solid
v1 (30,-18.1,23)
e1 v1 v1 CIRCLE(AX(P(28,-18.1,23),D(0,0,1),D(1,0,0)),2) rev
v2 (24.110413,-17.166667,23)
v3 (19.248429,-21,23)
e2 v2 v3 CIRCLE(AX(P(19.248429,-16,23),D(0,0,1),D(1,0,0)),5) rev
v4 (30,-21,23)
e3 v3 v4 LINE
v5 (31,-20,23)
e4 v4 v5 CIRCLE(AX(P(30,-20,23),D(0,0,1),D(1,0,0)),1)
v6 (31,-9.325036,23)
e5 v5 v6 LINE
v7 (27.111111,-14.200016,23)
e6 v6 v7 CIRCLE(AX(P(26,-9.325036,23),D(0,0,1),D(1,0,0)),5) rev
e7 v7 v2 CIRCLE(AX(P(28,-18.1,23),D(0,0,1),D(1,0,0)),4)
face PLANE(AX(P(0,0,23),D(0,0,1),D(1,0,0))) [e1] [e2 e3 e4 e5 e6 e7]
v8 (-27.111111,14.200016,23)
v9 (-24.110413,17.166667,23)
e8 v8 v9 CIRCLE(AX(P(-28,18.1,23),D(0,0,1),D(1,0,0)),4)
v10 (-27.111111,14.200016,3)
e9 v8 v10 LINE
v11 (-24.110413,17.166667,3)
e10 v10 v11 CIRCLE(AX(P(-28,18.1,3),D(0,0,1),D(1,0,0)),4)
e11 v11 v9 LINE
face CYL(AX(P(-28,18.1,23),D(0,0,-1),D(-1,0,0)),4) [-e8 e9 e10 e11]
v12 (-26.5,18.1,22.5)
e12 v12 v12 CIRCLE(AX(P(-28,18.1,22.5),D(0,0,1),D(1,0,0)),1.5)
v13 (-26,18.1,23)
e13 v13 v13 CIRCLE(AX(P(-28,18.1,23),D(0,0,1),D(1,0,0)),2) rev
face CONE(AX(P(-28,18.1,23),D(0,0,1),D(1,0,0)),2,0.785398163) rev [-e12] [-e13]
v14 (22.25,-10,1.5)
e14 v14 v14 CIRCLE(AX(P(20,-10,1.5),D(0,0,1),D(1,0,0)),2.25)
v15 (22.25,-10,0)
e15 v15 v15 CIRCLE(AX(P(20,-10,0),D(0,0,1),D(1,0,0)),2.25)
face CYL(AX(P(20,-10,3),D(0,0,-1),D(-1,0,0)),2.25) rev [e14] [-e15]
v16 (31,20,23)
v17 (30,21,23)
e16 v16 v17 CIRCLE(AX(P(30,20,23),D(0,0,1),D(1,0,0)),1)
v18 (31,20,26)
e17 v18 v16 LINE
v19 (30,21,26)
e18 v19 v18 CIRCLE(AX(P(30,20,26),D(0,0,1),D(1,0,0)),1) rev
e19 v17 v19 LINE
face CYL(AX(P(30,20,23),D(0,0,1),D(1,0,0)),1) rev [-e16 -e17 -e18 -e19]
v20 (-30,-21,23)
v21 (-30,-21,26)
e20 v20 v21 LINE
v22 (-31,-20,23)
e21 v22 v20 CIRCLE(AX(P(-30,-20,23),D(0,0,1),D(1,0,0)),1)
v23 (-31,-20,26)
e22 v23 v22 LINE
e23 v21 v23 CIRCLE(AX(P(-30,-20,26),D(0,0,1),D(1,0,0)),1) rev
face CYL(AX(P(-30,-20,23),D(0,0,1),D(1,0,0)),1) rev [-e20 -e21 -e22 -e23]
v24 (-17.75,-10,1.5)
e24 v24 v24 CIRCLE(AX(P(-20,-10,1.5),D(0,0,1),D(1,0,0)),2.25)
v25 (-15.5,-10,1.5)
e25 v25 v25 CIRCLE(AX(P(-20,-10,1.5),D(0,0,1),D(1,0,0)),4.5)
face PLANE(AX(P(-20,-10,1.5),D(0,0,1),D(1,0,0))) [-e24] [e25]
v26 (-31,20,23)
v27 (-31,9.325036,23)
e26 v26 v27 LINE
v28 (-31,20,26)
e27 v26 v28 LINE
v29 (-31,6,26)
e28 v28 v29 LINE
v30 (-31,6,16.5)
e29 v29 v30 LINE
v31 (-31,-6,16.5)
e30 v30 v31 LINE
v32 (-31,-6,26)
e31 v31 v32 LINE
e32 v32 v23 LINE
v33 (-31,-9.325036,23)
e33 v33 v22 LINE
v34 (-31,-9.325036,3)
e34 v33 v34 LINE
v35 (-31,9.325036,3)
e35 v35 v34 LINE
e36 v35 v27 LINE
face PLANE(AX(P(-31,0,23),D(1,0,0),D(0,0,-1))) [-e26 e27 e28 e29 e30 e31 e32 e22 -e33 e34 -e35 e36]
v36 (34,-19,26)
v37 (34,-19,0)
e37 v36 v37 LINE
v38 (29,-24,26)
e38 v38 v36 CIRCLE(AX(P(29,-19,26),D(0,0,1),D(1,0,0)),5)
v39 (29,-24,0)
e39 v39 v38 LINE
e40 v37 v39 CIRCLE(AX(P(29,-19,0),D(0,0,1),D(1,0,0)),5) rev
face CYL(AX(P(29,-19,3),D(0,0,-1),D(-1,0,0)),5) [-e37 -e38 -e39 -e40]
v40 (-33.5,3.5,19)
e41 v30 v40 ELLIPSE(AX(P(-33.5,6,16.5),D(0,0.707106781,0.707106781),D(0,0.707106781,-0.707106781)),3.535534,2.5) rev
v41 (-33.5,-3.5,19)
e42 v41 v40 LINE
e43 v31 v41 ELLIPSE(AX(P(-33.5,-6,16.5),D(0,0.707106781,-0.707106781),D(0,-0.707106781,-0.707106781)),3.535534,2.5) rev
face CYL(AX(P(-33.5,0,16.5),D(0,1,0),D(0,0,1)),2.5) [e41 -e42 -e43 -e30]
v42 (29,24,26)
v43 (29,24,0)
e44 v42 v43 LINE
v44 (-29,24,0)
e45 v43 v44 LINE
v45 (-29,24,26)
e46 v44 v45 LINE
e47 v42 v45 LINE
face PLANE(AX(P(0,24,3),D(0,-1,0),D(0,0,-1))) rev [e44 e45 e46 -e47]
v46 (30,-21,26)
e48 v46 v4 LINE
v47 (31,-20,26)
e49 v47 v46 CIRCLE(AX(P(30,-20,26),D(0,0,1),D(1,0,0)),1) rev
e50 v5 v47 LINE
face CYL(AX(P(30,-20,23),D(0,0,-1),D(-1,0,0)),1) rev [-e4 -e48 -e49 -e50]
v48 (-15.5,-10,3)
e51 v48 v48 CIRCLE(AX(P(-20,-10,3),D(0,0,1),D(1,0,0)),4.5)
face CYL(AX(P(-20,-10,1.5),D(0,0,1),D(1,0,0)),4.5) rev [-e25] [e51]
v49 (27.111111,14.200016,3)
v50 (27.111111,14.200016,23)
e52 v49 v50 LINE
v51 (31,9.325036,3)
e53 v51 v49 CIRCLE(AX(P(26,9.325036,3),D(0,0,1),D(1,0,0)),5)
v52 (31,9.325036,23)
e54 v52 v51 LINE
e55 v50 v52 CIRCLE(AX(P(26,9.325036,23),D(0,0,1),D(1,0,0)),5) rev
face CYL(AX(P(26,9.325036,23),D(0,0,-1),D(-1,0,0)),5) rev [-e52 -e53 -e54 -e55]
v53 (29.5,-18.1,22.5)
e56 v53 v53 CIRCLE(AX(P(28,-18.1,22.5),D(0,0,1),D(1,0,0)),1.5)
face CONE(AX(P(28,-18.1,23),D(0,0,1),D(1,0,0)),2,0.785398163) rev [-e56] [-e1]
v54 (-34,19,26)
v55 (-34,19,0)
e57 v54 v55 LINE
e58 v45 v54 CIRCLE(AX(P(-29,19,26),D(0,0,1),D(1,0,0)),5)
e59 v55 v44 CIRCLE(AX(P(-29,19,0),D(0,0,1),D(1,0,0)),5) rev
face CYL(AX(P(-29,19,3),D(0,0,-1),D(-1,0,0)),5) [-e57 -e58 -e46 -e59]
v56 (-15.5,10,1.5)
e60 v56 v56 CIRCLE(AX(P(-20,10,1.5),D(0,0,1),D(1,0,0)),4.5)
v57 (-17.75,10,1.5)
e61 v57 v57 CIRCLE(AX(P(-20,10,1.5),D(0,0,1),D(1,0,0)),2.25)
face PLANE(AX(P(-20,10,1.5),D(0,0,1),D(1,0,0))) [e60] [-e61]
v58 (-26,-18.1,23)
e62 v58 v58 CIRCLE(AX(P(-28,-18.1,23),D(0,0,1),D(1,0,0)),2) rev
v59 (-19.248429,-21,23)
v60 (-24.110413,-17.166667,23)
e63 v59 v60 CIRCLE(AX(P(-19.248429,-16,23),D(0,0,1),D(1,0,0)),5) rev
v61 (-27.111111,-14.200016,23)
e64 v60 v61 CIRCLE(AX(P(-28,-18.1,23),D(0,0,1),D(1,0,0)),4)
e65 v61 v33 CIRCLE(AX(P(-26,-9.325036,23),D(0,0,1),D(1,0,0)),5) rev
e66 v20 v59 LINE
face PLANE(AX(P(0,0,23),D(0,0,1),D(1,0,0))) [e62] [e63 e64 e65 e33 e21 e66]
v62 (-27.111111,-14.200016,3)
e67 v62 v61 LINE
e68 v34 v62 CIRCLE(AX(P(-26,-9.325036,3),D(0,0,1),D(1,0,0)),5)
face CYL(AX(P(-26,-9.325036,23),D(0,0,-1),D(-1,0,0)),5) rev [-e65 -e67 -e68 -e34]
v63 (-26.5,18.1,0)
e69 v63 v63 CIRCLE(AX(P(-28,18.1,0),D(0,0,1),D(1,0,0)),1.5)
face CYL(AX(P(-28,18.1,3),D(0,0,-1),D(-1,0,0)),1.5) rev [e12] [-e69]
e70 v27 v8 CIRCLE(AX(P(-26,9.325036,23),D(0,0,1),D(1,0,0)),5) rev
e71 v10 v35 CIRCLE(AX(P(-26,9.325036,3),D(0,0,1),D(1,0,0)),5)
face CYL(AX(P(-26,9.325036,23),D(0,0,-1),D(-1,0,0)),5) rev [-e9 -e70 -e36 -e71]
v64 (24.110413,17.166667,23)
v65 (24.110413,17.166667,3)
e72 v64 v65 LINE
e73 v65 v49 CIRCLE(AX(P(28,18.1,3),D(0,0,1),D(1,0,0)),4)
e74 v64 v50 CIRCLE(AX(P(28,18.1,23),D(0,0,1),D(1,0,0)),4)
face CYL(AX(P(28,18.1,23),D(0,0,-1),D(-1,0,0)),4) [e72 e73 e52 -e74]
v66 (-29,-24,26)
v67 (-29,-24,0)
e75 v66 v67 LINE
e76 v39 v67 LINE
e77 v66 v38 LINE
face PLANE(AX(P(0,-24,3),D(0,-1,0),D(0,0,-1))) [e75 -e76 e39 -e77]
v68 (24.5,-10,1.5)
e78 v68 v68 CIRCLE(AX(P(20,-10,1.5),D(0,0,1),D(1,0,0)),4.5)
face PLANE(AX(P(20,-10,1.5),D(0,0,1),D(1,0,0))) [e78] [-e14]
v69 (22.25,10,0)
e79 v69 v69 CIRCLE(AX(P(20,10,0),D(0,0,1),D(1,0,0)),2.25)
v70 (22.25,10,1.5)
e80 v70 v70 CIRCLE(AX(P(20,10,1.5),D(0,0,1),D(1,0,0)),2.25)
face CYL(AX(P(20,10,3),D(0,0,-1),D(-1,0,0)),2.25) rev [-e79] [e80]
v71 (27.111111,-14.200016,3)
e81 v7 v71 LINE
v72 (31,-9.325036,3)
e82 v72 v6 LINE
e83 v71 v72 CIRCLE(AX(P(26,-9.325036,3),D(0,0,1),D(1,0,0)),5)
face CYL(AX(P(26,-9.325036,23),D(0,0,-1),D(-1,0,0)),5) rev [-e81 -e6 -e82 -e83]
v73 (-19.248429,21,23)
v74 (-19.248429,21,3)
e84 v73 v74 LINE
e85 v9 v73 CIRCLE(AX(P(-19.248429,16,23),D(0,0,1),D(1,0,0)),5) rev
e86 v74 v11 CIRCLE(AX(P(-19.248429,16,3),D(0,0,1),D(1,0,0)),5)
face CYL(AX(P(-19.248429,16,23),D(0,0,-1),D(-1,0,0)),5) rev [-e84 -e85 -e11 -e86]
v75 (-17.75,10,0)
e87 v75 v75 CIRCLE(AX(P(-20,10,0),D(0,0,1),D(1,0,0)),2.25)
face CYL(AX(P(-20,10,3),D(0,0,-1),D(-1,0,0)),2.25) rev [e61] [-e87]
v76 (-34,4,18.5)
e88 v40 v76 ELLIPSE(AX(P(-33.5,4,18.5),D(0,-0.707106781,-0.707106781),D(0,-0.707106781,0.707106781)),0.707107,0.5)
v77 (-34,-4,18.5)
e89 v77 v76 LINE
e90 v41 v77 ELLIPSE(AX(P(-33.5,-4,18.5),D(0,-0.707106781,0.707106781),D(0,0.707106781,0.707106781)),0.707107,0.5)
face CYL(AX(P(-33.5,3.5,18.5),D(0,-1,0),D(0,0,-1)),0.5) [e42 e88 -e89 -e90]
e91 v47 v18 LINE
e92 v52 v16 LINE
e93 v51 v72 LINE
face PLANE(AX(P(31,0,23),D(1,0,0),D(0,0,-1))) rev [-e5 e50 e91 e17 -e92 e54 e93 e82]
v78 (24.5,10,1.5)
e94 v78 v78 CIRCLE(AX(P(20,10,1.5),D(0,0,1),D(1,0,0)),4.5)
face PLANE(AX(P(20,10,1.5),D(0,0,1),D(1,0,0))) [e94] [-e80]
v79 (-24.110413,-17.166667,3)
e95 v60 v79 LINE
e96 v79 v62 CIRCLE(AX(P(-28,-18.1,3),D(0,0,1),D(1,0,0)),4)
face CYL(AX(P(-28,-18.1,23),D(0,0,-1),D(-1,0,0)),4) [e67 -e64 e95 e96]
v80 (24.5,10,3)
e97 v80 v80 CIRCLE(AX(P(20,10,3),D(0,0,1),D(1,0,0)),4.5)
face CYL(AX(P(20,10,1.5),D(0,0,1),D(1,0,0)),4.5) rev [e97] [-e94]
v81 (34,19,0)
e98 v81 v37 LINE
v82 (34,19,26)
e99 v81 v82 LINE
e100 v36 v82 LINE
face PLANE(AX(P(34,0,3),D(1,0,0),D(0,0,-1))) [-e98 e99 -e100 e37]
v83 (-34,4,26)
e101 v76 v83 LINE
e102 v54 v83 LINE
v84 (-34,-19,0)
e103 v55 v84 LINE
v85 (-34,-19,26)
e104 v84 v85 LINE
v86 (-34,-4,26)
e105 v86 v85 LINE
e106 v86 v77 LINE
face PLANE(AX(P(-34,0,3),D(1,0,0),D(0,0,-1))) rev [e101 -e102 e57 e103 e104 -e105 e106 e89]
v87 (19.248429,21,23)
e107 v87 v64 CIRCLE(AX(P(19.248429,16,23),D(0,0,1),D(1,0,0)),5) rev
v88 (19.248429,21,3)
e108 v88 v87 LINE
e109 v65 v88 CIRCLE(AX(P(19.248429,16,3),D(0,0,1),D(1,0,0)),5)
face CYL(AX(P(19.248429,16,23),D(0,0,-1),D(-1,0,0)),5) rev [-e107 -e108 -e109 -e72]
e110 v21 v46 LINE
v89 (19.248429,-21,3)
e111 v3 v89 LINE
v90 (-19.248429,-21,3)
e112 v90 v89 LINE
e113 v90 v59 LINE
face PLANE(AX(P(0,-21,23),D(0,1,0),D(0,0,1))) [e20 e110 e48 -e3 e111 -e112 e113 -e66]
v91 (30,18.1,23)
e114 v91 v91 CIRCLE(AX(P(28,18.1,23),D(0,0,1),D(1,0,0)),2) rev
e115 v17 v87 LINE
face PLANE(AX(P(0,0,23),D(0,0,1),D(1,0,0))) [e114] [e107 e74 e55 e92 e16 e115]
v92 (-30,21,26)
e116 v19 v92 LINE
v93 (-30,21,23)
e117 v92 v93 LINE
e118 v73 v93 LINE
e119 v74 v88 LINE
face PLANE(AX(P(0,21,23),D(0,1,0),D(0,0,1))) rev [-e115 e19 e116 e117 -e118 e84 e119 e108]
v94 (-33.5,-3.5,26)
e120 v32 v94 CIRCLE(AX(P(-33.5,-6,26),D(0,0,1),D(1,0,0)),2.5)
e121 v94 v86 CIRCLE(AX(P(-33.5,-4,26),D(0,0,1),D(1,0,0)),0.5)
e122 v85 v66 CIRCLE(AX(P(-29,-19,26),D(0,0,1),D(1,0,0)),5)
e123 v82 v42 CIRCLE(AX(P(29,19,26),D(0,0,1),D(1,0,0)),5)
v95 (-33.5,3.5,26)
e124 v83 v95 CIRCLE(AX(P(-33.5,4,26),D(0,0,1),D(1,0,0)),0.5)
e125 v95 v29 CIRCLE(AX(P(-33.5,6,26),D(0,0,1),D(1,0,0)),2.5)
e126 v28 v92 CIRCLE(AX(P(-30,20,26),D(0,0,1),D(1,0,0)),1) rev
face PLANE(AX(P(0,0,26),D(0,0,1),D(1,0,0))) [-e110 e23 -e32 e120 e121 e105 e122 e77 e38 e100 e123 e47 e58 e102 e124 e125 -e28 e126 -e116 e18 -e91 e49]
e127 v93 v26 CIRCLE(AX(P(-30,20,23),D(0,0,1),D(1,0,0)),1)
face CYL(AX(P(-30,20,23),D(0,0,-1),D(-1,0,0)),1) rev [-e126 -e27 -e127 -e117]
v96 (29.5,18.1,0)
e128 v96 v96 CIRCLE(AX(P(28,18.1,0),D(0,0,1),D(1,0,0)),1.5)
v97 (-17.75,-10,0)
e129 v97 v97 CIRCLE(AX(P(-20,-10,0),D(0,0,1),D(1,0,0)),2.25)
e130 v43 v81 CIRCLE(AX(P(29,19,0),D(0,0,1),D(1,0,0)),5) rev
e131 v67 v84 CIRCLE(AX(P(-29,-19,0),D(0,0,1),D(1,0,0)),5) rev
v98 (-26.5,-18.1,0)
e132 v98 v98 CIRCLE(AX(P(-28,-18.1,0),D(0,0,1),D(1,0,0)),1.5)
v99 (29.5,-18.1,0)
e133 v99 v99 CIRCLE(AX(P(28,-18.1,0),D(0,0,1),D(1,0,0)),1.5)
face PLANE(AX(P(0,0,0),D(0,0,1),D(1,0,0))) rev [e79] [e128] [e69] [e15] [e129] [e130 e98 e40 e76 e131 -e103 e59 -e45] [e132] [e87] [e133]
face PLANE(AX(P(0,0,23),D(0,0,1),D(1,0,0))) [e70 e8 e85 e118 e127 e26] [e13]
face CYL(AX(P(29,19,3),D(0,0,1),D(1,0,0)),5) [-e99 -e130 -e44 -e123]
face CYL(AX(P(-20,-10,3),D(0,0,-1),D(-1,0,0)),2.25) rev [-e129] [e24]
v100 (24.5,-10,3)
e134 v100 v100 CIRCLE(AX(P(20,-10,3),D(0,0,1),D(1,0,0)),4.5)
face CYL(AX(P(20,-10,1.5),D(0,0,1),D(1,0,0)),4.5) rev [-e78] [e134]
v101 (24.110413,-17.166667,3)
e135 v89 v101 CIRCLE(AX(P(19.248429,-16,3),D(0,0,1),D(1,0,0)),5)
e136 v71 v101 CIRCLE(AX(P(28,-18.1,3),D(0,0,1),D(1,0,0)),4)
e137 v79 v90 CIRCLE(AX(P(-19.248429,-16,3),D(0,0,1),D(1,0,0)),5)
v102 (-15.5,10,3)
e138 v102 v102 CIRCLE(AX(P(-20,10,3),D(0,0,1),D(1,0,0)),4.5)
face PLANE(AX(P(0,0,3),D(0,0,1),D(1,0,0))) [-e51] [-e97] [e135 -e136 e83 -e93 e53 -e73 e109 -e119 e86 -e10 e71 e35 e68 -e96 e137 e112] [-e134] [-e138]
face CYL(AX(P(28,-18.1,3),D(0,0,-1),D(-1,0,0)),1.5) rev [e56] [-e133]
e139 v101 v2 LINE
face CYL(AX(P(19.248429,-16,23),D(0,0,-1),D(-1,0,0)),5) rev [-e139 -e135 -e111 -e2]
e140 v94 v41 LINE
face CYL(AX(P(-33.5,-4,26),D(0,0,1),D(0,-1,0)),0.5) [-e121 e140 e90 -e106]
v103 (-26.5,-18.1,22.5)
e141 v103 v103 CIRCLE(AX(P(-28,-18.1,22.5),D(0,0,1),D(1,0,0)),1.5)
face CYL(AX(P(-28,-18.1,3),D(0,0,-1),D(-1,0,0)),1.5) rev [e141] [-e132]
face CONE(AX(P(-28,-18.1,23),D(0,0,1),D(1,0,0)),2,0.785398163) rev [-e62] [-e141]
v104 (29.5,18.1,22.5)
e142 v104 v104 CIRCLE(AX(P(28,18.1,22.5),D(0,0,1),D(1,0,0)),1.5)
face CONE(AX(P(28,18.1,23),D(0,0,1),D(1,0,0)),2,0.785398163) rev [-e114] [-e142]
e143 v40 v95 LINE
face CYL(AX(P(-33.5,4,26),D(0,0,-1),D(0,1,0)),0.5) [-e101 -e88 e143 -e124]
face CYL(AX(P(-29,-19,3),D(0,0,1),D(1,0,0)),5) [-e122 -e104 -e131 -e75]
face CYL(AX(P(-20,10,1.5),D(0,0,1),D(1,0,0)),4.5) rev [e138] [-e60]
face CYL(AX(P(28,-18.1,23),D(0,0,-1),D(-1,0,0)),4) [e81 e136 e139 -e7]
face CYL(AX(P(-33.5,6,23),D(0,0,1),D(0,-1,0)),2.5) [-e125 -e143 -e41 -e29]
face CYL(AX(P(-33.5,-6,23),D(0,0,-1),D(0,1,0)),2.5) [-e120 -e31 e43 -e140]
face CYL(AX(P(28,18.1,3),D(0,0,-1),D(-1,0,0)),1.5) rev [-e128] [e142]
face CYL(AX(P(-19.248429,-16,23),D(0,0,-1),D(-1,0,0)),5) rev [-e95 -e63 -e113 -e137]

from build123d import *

# Parameters (mm, degrees)
SCHIZZO1_W                   = 68
SCHIZZO1_H                   = 48
SCHIZZO1_R                   = 1.5
SCHIZZO1_R_2                 = 2.25
ESTRUSIONE_ESTRUSIONE1_DEPTH = 3
SCHIZZO2_W                   = 68
SCHIZZO2_H                   = 48
SCHIZZO2_R                   = 1.5
ESTRUSIONE_ESTRUSIONE2_DEPTH = 20
SCHIZZO3_W                   = 68
SCHIZZO3_H                   = 48
SCHIZZO3_W_2                 = 62
SCHIZZO3_H_2                 = 42
ESTRUSIONE_ESTRUSIONE3_DEPTH = 3
SMUSSO1_SIZE                 = 0.5
RACCORDO1_R                  = 5
SCHIZZO4_R                   = 4.5
TAGLIO_ESTRUSIONE1_DEPTH     = 1.5
RACCORDO2_R                  = 5
RACCORDO3_R                  = 1
TAGLIO_ESTRUSIONE2_REACH     = 78.655
SCHIZZO5_W                   = 7
SCHIZZO5_H                   = 7
RACCORDO4_R                  = 2.5
RACCORDO5_R                  = 0.5


with BuildPart() as part:
    # Schizzo1 → Estrusione-Estrusione1 (new body)
    with BuildSketch(Plane.XY):
        Rectangle(SCHIZZO1_W, SCHIZZO1_H)
        with Locations((-28, 18.1)):
            Circle(SCHIZZO1_R, mode=Mode.SUBTRACT)
        with Locations((-28, -18.1)):
            Circle(SCHIZZO1_R, mode=Mode.SUBTRACT)
        with Locations((28, -18.1)):
            Circle(SCHIZZO1_R, mode=Mode.SUBTRACT)
        with Locations((28, 18.1)):
            Circle(SCHIZZO1_R, mode=Mode.SUBTRACT)
        with Locations((20, -10)):
            Circle(SCHIZZO1_R_2, mode=Mode.SUBTRACT)
        with Locations((20, 10)):
            Circle(SCHIZZO1_R_2, mode=Mode.SUBTRACT)
        with Locations((-20, 10)):
            Circle(SCHIZZO1_R_2, mode=Mode.SUBTRACT)
        with Locations((-20, -10)):
            Circle(SCHIZZO1_R_2, mode=Mode.SUBTRACT)
    extrude(amount=ESTRUSIONE_ESTRUSIONE1_DEPTH)

    # Schizzo2 → Estrusione-Estrusione2 (add)
    with BuildSketch(Plane.XY.offset(3)):
        Rectangle(SCHIZZO2_W, SCHIZZO2_H)
        with BuildLine():
            ThreePointArc((-31, 15.454248689), (-25.224419663, 15.219695538), (-25.245004537, 21))
            Line((-25.245004537, 21), (25.245004537, 21))
            ThreePointArc((25.245004537, 21), (25.224419663, 15.219695538), (31, 15.454248689))
            Line((31, 15.454248689), (31, -15.454248689))
            ThreePointArc((31, -15.454248689), (25.224419663, -15.219695538), (25.245004537, -21))
            Line((25.245004537, -21), (-25.245004537, -21))
            ThreePointArc((-25.245004537, -21), (-25.224419663, -15.219695538), (-31, -15.454248689))
            Line((-31, -15.454248689), (-31, 15.454248689))
        make_face(mode=Mode.SUBTRACT)
        with BuildLine():
            ThreePointArc((-30.754995463, 21), (-30.880304462, 20.875580337), (-31, 20.745751311))
            Line((-31, 20.745751311), (-31, 21))
            Line((-31, 21), (-30.754995463, 21))
        make_face(mode=Mode.SUBTRACT)
        with Locations((-28, 18.1)):
            Circle(SCHIZZO2_R, mode=Mode.SUBTRACT)
        with BuildLine():
            Line((-31, -21), (-31, -20.745751311))
            ThreePointArc((-31, -20.745751311), (-30.880304462, -20.875580337), (-30.754995463, -21))
            Line((-30.754995463, -21), (-31, -21))
        make_face(mode=Mode.SUBTRACT)
        with BuildLine():
            Line((31, -21), (30.754995463, -21))
            ThreePointArc((30.754995463, -21), (30.880304462, -20.875580337), (31, -20.745751311))
            Line((31, -20.745751311), (31, -21))
        make_face(mode=Mode.SUBTRACT)
        with BuildLine():
            Line((31, 21), (31, 20.745751311))
            ThreePointArc((31, 20.745751311), (30.880304462, 20.875580337), (30.754995463, 21))
            Line((30.754995463, 21), (31, 21))
        make_face(mode=Mode.SUBTRACT)
        with Locations((-28, -18.1)):
            Circle(SCHIZZO2_R, mode=Mode.SUBTRACT)
        with Locations((28, -18.1)):
            Circle(SCHIZZO2_R, mode=Mode.SUBTRACT)
        with Locations((28, 18.1)):
            Circle(SCHIZZO2_R, mode=Mode.SUBTRACT)
    extrude(amount=ESTRUSIONE_ESTRUSIONE2_DEPTH)

    # Schizzo3 → Estrusione-Estrusione3 (add)
    with BuildSketch(Plane.XY.offset(23)):
        Rectangle(SCHIZZO3_W, SCHIZZO3_H)
        Rectangle(SCHIZZO3_W_2, SCHIZZO3_H_2, mode=Mode.SUBTRACT)
    extrude(amount=ESTRUSIONE_ESTRUSIONE3_DEPTH)

    # Smusso1
    smusso1_edges = [part.edges().sort_by_distance(p)[0] for p in [
        (-29.5, 18.1, 23),
        (26.5, -18.1, 23),
        (-29.5, -18.1, 23),
        (26.5, 18.1, 23),
    ]]
    chamfer(smusso1_edges, length=SMUSSO1_SIZE)

    # Raccordo1
    raccordo1_edges = [part.edges().sort_by_distance(p)[0] for p in [
        (34, 24, 13),
        (34, -24, 13),
        (-34, -24, 13),
        (-34, 24, 13),
    ]]
    fillet(raccordo1_edges, radius=RACCORDO1_R)

    # Schizzo4 → Taglio-Estrusione1 (cut)
    with BuildSketch(Plane.XY.offset(3)):
        with Locations((-20, 10)):
            Circle(SCHIZZO4_R)
        with Locations((-20, -10)):
            Circle(SCHIZZO4_R)
        with Locations((20, -10)):
            Circle(SCHIZZO4_R)
        with Locations((20, 10)):
            Circle(SCHIZZO4_R)
    extrude(amount=-TAGLIO_ESTRUSIONE1_DEPTH, mode=Mode.SUBTRACT)

    # Raccordo2
    raccordo2_edges = [part.edges().sort_by_distance(p)[0] for p in [
        (-31, 15.454248689, 13),
        (-25.245004537, 21, 13),
        (25.245004537, 21, 13),
        (31, 15.454248689, 13),
        (31, -15.454248689, 13),
        (25.245004537, -21, 13),
        (-25.245004537, -21, 13),
        (-31, -15.454248689, 13),
    ]]
    fillet(raccordo2_edges, radius=RACCORDO2_R)

    # Raccordo3
    raccordo3_edges = [part.edges().sort_by_distance(p)[0] for p in [
        (31, -21, 14.5),
        (-31, -21, 14.5),
        (-31, 21, 14.5),
        (31, 21, 14.5),
    ]]
    fillet(raccordo3_edges, radius=RACCORDO3_R)

    # Schizzo5 → Taglio-Estrusione2 (cut, up to next)
    with BuildSketch(Plane.ZY.offset(34), mode=Mode.PRIVATE) as taglio_estrusione2_sk1:
        with Locations((22.5, 0)):
            Rectangle(SCHIZZO5_W, SCHIZZO5_H)
    taglio_estrusione2_tool1 = extrude(taglio_estrusione2_sk1.sketch, amount=-TAGLIO_ESTRUSIONE2_REACH, mode=Mode.PRIVATE) & part.part
    add(taglio_estrusione2_tool1.solids().sort_by_distance((-34, 0, 22.5))[0], mode=Mode.SUBTRACT)

    # Raccordo4
    raccordo4_edges = [part.edges().sort_by_distance(p)[0] for p in [
        (-31, -3.5, 22.5),
        (-31, 0, 19),
        (-31, 3.5, 22.5),
    ]]
    fillet(raccordo4_edges, radius=RACCORDO4_R)

    # Raccordo5
    raccordo5_edges = [part.edges().sort_by_distance(p)[0] for p in [
        (-34, -3.5, 22.5),
        (-34, 0, 19),
        (-34, 3.5, 22.5),
    ]]
    fillet(raccordo5_edges, radius=RACCORDO5_R - 0.0001)  # a hair under: the kernel refuses the full size


solid = part.part
